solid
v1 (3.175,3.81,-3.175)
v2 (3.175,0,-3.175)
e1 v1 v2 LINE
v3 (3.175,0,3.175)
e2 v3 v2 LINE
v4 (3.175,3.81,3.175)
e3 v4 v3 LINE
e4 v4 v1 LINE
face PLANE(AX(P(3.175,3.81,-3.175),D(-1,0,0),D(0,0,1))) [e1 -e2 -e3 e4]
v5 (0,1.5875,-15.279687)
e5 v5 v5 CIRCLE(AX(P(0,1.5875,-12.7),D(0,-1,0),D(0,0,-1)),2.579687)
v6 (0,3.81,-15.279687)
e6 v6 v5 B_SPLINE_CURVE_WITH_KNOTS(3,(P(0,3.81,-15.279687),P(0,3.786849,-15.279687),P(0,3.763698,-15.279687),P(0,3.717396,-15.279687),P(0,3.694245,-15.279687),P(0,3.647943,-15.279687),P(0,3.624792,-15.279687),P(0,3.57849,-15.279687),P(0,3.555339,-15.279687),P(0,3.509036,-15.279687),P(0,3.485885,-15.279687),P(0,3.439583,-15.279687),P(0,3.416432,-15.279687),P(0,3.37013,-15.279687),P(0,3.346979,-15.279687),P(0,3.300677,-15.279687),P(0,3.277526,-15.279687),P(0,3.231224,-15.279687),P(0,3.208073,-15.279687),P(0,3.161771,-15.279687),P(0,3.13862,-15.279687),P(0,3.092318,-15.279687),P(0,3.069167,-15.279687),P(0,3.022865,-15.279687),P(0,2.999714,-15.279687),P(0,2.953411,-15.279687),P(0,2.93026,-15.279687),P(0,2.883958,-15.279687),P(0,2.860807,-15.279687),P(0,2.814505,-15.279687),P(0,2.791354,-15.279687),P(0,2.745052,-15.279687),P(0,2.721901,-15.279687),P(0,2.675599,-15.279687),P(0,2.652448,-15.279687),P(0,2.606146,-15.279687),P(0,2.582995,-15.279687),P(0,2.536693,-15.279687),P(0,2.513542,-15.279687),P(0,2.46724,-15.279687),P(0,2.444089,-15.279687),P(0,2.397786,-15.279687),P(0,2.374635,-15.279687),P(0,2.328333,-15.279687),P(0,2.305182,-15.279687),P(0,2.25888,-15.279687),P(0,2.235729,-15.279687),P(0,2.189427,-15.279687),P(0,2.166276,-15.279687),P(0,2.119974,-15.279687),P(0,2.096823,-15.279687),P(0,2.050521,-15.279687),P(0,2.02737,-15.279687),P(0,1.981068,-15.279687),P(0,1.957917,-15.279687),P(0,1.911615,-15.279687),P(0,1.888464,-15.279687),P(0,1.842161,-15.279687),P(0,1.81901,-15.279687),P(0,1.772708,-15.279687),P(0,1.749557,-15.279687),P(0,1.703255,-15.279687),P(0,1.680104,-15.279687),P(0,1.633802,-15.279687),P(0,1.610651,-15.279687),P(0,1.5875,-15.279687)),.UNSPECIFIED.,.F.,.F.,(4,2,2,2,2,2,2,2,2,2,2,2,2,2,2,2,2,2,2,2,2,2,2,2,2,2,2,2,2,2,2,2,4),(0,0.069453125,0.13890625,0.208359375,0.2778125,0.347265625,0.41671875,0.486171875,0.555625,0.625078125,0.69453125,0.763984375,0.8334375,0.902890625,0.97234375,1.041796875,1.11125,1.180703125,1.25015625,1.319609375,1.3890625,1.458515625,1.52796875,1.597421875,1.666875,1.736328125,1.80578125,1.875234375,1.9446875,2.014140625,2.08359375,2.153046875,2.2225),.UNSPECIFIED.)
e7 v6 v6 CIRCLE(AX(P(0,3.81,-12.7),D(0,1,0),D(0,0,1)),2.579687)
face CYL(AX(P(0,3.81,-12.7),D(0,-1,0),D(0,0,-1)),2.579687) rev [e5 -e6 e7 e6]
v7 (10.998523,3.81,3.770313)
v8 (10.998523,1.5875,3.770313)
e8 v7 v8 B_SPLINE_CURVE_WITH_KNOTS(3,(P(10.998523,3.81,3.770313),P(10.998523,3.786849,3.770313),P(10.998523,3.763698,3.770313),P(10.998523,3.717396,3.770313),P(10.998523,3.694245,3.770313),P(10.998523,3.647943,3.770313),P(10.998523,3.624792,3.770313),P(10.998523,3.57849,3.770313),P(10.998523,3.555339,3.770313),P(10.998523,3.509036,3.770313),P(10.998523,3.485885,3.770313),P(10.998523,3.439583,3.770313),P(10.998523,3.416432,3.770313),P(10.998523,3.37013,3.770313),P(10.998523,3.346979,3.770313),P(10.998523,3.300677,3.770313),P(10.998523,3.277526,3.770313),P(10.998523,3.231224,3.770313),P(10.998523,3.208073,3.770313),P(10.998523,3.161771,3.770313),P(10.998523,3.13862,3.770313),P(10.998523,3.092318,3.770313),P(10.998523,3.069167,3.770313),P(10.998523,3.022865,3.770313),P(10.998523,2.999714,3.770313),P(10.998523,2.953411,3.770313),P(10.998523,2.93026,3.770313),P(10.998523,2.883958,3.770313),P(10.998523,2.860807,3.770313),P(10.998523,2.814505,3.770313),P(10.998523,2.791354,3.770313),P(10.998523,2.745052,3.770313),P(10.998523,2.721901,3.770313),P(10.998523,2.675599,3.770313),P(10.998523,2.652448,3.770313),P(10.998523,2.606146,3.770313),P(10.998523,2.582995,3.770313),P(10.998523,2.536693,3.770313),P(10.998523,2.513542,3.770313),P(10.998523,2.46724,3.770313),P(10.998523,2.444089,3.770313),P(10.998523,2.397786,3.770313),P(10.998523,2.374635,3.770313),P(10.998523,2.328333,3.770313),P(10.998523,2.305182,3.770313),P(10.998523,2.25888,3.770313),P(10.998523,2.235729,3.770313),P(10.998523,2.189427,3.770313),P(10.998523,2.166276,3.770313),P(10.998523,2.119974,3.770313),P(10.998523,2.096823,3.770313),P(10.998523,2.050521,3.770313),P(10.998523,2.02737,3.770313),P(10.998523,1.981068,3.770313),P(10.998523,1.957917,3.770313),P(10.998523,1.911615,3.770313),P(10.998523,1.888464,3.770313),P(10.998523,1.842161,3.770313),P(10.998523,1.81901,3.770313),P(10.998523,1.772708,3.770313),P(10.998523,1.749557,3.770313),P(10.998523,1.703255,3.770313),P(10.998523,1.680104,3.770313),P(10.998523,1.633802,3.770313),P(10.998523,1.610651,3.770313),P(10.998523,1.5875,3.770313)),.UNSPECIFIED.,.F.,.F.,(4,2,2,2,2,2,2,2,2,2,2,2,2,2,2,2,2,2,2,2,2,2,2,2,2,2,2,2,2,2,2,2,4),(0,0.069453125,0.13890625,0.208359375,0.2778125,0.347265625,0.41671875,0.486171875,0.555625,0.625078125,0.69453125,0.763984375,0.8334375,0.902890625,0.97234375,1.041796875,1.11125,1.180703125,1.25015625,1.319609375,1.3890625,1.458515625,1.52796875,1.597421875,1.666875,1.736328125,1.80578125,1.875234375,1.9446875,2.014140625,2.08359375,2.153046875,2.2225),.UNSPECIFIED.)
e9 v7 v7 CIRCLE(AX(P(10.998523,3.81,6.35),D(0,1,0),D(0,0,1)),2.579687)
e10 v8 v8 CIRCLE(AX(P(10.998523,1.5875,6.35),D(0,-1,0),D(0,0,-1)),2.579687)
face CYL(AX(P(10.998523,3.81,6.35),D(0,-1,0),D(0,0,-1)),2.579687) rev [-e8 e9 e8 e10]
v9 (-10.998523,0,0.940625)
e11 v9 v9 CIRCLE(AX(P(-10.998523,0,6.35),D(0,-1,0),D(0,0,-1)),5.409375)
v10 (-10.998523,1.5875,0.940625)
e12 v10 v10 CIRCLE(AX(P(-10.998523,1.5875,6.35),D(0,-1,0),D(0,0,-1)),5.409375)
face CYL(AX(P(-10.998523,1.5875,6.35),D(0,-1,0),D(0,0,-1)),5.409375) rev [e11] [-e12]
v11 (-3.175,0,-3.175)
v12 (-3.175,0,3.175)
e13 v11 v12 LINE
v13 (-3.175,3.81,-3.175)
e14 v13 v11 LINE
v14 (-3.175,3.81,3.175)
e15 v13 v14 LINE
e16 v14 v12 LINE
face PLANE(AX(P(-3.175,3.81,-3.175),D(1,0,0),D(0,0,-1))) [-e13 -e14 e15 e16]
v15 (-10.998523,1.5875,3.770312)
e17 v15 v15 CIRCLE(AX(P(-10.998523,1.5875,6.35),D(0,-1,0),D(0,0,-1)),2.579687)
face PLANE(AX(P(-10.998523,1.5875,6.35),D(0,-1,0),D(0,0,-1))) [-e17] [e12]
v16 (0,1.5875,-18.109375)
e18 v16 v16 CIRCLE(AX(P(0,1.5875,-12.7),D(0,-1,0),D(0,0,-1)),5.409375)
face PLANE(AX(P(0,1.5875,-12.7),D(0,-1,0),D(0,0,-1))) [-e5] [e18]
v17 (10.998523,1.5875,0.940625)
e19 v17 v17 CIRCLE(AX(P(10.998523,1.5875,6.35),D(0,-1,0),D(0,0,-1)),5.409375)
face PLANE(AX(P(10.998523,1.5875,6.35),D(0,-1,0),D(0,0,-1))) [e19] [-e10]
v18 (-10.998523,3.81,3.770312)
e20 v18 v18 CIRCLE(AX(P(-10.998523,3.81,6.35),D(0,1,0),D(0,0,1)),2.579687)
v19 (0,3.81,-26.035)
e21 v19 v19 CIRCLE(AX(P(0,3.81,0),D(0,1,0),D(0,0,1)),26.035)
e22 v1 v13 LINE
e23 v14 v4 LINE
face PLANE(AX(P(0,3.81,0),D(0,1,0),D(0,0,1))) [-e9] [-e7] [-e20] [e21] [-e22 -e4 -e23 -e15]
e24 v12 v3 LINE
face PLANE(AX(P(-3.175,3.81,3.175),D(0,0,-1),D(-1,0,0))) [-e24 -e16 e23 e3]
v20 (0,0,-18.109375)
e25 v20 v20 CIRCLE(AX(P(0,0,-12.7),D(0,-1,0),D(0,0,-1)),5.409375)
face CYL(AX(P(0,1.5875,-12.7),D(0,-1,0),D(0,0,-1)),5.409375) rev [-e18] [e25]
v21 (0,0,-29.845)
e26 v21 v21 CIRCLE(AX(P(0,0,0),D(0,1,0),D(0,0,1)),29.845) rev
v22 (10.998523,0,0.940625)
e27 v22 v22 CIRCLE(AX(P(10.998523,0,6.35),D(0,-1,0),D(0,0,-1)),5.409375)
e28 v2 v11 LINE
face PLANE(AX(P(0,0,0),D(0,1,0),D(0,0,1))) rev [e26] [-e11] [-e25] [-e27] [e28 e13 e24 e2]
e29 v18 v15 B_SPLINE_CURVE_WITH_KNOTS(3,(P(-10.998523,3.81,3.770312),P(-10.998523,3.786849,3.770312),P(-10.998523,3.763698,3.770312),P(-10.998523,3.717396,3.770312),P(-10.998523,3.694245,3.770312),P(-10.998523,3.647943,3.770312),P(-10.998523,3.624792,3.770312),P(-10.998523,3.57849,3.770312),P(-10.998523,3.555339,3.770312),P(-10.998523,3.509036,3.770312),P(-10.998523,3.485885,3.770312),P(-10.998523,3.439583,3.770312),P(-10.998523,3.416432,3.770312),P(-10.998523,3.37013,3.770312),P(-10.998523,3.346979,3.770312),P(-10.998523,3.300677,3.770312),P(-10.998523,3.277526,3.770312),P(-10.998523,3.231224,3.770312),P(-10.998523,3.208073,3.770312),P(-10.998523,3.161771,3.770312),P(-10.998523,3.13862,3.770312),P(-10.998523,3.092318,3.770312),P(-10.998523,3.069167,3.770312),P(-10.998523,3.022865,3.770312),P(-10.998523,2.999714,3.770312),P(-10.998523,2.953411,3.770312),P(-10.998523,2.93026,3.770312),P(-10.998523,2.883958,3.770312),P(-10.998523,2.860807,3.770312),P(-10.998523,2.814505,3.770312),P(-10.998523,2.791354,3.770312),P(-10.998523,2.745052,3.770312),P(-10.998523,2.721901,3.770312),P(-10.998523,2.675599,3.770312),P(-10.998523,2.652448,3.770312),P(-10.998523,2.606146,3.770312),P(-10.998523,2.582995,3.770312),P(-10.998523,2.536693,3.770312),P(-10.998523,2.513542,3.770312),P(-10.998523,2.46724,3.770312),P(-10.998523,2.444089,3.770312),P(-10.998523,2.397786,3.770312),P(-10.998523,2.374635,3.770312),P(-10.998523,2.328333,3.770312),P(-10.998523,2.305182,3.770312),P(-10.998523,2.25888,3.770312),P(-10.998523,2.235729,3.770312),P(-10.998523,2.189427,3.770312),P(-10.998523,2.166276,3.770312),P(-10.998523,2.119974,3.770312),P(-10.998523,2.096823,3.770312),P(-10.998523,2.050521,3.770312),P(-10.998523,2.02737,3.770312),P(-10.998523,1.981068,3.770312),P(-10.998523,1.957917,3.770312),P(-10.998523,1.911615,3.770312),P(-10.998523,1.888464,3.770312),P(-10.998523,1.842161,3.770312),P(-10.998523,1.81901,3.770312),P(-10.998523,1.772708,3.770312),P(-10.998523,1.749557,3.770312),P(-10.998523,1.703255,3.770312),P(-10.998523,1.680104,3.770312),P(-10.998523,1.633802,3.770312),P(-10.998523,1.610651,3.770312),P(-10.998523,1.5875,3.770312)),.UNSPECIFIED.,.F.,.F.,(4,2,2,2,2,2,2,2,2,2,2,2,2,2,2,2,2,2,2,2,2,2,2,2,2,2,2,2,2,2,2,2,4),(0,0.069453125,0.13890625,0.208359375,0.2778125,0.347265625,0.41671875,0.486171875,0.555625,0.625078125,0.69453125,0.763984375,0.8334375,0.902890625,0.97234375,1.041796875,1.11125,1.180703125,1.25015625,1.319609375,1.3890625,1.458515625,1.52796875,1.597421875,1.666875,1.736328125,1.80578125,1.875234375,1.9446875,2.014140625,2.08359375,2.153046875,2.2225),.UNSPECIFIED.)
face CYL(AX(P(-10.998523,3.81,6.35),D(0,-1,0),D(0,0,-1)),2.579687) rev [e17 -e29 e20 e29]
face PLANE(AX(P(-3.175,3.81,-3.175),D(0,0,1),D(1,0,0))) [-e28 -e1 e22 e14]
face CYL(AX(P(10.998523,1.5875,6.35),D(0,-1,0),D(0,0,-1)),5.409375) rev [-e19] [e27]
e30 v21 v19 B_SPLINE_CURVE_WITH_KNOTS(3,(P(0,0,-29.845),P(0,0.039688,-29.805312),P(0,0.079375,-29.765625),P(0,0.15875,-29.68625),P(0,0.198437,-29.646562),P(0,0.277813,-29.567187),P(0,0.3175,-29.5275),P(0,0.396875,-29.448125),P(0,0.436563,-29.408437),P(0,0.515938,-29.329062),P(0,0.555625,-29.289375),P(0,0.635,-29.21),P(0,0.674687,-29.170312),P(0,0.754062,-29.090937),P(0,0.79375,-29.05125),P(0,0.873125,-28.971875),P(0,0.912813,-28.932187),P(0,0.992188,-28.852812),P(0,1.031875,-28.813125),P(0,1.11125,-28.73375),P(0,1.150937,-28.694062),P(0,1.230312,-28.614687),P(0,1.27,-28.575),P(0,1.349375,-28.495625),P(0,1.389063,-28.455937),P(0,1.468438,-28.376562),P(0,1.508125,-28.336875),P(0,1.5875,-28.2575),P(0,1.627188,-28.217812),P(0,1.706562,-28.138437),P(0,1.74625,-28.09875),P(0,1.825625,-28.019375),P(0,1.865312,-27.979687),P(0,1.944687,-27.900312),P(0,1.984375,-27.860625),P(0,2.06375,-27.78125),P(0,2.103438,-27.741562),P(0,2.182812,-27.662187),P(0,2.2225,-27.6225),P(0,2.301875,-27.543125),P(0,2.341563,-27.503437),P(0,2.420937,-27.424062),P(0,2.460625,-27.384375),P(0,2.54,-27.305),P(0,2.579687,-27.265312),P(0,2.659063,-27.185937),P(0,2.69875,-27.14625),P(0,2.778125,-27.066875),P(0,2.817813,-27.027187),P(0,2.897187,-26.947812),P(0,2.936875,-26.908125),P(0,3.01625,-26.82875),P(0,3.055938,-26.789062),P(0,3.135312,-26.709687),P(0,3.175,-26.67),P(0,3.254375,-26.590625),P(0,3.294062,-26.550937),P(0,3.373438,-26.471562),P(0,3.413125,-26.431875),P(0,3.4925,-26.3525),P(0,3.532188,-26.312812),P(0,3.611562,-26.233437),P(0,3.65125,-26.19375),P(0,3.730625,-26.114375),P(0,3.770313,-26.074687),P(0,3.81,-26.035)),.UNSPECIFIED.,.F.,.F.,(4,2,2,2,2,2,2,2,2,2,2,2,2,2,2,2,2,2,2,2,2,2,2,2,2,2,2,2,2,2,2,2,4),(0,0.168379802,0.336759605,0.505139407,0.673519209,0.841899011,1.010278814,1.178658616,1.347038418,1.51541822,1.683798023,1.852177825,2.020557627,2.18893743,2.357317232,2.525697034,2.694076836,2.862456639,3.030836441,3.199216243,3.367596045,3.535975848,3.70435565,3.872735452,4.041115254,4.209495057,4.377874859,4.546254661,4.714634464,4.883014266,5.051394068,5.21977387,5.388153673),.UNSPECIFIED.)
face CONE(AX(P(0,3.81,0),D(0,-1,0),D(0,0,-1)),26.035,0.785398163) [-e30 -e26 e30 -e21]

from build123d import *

# Parameters (mm, degrees)
SKETCH1_R           = 31.75
SKETCH1_R_2         = 2.5796875
SKETCH1_W           = 6.35
SKETCH1_H           = 6.35
BOSS_EXTRUDE1_DEPTH = 3.81
CHAMFER1_SIZE       = 5.715
SKETCH2_R           = 5.409375008
CUT_EXTRUDE1_DEPTH  = 1.5875


with BuildPart() as part:
    # Sketch1 → Boss-Extrude1 (new body)
    with BuildSketch(Plane(origin=(0, 0, 0), x_dir=(1, 0, 0), z_dir=(0, 1, 0))):
        with Locations(Location((0, 0, 0), (0, 0, 90))):
            Circle(SKETCH1_R)
        with Locations(Location((0, 12.7, 0), (0, 0, 90))):
            Circle(SKETCH1_R_2, mode=Mode.SUBTRACT)
        with Locations(Location((10.998522628, -6.35, 0), (0, 0, 90))):
            Circle(SKETCH1_R_2, mode=Mode.SUBTRACT)
        with Locations(Location((-10.998522628, -6.35, 0), (0, 0, 90))):
            Circle(SKETCH1_R_2, mode=Mode.SUBTRACT)
        Rectangle(SKETCH1_W, SKETCH1_H, mode=Mode.SUBTRACT)
    extrude(amount=BOSS_EXTRUDE1_DEPTH)

    # Chamfer1
    # the kernel refuses this chamfer: 5.715 mm, written as the material it takes off along each edge
    with BuildSketch(Plane(origin=(0, 3.81, 0), x_dir=(0, 0, -1), z_dir=(1, 0, 0))) as chamfer1_piece_1:
        Polygon((31.75, -CHAMFER1_SIZE), (31.75 - CHAMFER1_SIZE, 0), (31.75, 0), align=None)
    revolve(axis=Axis((0, 3.81, 0), (0, 1, 0)), mode=Mode.SUBTRACT)

    # Sketch2 → Cut-Extrude1 (cut)
    with BuildSketch(Plane(origin=(0, 0, 0), x_dir=(-1, 0, 0), z_dir=(0, -1, 0))):
        with Locations(Location((0, 12.7, 0), (0, 0, 90))):
            Circle(SKETCH2_R)
        with Locations(Location((10.998522628, -6.35, 0), (0, 0, 90))):
            Circle(SKETCH2_R)
        with Locations(Location((-10.998522628, -6.35, 0), (0, 0, 90))):
            Circle(SKETCH2_R)
    extrude(amount=-CUT_EXTRUDE1_DEPTH, mode=Mode.SUBTRACT)


solid = part.part
